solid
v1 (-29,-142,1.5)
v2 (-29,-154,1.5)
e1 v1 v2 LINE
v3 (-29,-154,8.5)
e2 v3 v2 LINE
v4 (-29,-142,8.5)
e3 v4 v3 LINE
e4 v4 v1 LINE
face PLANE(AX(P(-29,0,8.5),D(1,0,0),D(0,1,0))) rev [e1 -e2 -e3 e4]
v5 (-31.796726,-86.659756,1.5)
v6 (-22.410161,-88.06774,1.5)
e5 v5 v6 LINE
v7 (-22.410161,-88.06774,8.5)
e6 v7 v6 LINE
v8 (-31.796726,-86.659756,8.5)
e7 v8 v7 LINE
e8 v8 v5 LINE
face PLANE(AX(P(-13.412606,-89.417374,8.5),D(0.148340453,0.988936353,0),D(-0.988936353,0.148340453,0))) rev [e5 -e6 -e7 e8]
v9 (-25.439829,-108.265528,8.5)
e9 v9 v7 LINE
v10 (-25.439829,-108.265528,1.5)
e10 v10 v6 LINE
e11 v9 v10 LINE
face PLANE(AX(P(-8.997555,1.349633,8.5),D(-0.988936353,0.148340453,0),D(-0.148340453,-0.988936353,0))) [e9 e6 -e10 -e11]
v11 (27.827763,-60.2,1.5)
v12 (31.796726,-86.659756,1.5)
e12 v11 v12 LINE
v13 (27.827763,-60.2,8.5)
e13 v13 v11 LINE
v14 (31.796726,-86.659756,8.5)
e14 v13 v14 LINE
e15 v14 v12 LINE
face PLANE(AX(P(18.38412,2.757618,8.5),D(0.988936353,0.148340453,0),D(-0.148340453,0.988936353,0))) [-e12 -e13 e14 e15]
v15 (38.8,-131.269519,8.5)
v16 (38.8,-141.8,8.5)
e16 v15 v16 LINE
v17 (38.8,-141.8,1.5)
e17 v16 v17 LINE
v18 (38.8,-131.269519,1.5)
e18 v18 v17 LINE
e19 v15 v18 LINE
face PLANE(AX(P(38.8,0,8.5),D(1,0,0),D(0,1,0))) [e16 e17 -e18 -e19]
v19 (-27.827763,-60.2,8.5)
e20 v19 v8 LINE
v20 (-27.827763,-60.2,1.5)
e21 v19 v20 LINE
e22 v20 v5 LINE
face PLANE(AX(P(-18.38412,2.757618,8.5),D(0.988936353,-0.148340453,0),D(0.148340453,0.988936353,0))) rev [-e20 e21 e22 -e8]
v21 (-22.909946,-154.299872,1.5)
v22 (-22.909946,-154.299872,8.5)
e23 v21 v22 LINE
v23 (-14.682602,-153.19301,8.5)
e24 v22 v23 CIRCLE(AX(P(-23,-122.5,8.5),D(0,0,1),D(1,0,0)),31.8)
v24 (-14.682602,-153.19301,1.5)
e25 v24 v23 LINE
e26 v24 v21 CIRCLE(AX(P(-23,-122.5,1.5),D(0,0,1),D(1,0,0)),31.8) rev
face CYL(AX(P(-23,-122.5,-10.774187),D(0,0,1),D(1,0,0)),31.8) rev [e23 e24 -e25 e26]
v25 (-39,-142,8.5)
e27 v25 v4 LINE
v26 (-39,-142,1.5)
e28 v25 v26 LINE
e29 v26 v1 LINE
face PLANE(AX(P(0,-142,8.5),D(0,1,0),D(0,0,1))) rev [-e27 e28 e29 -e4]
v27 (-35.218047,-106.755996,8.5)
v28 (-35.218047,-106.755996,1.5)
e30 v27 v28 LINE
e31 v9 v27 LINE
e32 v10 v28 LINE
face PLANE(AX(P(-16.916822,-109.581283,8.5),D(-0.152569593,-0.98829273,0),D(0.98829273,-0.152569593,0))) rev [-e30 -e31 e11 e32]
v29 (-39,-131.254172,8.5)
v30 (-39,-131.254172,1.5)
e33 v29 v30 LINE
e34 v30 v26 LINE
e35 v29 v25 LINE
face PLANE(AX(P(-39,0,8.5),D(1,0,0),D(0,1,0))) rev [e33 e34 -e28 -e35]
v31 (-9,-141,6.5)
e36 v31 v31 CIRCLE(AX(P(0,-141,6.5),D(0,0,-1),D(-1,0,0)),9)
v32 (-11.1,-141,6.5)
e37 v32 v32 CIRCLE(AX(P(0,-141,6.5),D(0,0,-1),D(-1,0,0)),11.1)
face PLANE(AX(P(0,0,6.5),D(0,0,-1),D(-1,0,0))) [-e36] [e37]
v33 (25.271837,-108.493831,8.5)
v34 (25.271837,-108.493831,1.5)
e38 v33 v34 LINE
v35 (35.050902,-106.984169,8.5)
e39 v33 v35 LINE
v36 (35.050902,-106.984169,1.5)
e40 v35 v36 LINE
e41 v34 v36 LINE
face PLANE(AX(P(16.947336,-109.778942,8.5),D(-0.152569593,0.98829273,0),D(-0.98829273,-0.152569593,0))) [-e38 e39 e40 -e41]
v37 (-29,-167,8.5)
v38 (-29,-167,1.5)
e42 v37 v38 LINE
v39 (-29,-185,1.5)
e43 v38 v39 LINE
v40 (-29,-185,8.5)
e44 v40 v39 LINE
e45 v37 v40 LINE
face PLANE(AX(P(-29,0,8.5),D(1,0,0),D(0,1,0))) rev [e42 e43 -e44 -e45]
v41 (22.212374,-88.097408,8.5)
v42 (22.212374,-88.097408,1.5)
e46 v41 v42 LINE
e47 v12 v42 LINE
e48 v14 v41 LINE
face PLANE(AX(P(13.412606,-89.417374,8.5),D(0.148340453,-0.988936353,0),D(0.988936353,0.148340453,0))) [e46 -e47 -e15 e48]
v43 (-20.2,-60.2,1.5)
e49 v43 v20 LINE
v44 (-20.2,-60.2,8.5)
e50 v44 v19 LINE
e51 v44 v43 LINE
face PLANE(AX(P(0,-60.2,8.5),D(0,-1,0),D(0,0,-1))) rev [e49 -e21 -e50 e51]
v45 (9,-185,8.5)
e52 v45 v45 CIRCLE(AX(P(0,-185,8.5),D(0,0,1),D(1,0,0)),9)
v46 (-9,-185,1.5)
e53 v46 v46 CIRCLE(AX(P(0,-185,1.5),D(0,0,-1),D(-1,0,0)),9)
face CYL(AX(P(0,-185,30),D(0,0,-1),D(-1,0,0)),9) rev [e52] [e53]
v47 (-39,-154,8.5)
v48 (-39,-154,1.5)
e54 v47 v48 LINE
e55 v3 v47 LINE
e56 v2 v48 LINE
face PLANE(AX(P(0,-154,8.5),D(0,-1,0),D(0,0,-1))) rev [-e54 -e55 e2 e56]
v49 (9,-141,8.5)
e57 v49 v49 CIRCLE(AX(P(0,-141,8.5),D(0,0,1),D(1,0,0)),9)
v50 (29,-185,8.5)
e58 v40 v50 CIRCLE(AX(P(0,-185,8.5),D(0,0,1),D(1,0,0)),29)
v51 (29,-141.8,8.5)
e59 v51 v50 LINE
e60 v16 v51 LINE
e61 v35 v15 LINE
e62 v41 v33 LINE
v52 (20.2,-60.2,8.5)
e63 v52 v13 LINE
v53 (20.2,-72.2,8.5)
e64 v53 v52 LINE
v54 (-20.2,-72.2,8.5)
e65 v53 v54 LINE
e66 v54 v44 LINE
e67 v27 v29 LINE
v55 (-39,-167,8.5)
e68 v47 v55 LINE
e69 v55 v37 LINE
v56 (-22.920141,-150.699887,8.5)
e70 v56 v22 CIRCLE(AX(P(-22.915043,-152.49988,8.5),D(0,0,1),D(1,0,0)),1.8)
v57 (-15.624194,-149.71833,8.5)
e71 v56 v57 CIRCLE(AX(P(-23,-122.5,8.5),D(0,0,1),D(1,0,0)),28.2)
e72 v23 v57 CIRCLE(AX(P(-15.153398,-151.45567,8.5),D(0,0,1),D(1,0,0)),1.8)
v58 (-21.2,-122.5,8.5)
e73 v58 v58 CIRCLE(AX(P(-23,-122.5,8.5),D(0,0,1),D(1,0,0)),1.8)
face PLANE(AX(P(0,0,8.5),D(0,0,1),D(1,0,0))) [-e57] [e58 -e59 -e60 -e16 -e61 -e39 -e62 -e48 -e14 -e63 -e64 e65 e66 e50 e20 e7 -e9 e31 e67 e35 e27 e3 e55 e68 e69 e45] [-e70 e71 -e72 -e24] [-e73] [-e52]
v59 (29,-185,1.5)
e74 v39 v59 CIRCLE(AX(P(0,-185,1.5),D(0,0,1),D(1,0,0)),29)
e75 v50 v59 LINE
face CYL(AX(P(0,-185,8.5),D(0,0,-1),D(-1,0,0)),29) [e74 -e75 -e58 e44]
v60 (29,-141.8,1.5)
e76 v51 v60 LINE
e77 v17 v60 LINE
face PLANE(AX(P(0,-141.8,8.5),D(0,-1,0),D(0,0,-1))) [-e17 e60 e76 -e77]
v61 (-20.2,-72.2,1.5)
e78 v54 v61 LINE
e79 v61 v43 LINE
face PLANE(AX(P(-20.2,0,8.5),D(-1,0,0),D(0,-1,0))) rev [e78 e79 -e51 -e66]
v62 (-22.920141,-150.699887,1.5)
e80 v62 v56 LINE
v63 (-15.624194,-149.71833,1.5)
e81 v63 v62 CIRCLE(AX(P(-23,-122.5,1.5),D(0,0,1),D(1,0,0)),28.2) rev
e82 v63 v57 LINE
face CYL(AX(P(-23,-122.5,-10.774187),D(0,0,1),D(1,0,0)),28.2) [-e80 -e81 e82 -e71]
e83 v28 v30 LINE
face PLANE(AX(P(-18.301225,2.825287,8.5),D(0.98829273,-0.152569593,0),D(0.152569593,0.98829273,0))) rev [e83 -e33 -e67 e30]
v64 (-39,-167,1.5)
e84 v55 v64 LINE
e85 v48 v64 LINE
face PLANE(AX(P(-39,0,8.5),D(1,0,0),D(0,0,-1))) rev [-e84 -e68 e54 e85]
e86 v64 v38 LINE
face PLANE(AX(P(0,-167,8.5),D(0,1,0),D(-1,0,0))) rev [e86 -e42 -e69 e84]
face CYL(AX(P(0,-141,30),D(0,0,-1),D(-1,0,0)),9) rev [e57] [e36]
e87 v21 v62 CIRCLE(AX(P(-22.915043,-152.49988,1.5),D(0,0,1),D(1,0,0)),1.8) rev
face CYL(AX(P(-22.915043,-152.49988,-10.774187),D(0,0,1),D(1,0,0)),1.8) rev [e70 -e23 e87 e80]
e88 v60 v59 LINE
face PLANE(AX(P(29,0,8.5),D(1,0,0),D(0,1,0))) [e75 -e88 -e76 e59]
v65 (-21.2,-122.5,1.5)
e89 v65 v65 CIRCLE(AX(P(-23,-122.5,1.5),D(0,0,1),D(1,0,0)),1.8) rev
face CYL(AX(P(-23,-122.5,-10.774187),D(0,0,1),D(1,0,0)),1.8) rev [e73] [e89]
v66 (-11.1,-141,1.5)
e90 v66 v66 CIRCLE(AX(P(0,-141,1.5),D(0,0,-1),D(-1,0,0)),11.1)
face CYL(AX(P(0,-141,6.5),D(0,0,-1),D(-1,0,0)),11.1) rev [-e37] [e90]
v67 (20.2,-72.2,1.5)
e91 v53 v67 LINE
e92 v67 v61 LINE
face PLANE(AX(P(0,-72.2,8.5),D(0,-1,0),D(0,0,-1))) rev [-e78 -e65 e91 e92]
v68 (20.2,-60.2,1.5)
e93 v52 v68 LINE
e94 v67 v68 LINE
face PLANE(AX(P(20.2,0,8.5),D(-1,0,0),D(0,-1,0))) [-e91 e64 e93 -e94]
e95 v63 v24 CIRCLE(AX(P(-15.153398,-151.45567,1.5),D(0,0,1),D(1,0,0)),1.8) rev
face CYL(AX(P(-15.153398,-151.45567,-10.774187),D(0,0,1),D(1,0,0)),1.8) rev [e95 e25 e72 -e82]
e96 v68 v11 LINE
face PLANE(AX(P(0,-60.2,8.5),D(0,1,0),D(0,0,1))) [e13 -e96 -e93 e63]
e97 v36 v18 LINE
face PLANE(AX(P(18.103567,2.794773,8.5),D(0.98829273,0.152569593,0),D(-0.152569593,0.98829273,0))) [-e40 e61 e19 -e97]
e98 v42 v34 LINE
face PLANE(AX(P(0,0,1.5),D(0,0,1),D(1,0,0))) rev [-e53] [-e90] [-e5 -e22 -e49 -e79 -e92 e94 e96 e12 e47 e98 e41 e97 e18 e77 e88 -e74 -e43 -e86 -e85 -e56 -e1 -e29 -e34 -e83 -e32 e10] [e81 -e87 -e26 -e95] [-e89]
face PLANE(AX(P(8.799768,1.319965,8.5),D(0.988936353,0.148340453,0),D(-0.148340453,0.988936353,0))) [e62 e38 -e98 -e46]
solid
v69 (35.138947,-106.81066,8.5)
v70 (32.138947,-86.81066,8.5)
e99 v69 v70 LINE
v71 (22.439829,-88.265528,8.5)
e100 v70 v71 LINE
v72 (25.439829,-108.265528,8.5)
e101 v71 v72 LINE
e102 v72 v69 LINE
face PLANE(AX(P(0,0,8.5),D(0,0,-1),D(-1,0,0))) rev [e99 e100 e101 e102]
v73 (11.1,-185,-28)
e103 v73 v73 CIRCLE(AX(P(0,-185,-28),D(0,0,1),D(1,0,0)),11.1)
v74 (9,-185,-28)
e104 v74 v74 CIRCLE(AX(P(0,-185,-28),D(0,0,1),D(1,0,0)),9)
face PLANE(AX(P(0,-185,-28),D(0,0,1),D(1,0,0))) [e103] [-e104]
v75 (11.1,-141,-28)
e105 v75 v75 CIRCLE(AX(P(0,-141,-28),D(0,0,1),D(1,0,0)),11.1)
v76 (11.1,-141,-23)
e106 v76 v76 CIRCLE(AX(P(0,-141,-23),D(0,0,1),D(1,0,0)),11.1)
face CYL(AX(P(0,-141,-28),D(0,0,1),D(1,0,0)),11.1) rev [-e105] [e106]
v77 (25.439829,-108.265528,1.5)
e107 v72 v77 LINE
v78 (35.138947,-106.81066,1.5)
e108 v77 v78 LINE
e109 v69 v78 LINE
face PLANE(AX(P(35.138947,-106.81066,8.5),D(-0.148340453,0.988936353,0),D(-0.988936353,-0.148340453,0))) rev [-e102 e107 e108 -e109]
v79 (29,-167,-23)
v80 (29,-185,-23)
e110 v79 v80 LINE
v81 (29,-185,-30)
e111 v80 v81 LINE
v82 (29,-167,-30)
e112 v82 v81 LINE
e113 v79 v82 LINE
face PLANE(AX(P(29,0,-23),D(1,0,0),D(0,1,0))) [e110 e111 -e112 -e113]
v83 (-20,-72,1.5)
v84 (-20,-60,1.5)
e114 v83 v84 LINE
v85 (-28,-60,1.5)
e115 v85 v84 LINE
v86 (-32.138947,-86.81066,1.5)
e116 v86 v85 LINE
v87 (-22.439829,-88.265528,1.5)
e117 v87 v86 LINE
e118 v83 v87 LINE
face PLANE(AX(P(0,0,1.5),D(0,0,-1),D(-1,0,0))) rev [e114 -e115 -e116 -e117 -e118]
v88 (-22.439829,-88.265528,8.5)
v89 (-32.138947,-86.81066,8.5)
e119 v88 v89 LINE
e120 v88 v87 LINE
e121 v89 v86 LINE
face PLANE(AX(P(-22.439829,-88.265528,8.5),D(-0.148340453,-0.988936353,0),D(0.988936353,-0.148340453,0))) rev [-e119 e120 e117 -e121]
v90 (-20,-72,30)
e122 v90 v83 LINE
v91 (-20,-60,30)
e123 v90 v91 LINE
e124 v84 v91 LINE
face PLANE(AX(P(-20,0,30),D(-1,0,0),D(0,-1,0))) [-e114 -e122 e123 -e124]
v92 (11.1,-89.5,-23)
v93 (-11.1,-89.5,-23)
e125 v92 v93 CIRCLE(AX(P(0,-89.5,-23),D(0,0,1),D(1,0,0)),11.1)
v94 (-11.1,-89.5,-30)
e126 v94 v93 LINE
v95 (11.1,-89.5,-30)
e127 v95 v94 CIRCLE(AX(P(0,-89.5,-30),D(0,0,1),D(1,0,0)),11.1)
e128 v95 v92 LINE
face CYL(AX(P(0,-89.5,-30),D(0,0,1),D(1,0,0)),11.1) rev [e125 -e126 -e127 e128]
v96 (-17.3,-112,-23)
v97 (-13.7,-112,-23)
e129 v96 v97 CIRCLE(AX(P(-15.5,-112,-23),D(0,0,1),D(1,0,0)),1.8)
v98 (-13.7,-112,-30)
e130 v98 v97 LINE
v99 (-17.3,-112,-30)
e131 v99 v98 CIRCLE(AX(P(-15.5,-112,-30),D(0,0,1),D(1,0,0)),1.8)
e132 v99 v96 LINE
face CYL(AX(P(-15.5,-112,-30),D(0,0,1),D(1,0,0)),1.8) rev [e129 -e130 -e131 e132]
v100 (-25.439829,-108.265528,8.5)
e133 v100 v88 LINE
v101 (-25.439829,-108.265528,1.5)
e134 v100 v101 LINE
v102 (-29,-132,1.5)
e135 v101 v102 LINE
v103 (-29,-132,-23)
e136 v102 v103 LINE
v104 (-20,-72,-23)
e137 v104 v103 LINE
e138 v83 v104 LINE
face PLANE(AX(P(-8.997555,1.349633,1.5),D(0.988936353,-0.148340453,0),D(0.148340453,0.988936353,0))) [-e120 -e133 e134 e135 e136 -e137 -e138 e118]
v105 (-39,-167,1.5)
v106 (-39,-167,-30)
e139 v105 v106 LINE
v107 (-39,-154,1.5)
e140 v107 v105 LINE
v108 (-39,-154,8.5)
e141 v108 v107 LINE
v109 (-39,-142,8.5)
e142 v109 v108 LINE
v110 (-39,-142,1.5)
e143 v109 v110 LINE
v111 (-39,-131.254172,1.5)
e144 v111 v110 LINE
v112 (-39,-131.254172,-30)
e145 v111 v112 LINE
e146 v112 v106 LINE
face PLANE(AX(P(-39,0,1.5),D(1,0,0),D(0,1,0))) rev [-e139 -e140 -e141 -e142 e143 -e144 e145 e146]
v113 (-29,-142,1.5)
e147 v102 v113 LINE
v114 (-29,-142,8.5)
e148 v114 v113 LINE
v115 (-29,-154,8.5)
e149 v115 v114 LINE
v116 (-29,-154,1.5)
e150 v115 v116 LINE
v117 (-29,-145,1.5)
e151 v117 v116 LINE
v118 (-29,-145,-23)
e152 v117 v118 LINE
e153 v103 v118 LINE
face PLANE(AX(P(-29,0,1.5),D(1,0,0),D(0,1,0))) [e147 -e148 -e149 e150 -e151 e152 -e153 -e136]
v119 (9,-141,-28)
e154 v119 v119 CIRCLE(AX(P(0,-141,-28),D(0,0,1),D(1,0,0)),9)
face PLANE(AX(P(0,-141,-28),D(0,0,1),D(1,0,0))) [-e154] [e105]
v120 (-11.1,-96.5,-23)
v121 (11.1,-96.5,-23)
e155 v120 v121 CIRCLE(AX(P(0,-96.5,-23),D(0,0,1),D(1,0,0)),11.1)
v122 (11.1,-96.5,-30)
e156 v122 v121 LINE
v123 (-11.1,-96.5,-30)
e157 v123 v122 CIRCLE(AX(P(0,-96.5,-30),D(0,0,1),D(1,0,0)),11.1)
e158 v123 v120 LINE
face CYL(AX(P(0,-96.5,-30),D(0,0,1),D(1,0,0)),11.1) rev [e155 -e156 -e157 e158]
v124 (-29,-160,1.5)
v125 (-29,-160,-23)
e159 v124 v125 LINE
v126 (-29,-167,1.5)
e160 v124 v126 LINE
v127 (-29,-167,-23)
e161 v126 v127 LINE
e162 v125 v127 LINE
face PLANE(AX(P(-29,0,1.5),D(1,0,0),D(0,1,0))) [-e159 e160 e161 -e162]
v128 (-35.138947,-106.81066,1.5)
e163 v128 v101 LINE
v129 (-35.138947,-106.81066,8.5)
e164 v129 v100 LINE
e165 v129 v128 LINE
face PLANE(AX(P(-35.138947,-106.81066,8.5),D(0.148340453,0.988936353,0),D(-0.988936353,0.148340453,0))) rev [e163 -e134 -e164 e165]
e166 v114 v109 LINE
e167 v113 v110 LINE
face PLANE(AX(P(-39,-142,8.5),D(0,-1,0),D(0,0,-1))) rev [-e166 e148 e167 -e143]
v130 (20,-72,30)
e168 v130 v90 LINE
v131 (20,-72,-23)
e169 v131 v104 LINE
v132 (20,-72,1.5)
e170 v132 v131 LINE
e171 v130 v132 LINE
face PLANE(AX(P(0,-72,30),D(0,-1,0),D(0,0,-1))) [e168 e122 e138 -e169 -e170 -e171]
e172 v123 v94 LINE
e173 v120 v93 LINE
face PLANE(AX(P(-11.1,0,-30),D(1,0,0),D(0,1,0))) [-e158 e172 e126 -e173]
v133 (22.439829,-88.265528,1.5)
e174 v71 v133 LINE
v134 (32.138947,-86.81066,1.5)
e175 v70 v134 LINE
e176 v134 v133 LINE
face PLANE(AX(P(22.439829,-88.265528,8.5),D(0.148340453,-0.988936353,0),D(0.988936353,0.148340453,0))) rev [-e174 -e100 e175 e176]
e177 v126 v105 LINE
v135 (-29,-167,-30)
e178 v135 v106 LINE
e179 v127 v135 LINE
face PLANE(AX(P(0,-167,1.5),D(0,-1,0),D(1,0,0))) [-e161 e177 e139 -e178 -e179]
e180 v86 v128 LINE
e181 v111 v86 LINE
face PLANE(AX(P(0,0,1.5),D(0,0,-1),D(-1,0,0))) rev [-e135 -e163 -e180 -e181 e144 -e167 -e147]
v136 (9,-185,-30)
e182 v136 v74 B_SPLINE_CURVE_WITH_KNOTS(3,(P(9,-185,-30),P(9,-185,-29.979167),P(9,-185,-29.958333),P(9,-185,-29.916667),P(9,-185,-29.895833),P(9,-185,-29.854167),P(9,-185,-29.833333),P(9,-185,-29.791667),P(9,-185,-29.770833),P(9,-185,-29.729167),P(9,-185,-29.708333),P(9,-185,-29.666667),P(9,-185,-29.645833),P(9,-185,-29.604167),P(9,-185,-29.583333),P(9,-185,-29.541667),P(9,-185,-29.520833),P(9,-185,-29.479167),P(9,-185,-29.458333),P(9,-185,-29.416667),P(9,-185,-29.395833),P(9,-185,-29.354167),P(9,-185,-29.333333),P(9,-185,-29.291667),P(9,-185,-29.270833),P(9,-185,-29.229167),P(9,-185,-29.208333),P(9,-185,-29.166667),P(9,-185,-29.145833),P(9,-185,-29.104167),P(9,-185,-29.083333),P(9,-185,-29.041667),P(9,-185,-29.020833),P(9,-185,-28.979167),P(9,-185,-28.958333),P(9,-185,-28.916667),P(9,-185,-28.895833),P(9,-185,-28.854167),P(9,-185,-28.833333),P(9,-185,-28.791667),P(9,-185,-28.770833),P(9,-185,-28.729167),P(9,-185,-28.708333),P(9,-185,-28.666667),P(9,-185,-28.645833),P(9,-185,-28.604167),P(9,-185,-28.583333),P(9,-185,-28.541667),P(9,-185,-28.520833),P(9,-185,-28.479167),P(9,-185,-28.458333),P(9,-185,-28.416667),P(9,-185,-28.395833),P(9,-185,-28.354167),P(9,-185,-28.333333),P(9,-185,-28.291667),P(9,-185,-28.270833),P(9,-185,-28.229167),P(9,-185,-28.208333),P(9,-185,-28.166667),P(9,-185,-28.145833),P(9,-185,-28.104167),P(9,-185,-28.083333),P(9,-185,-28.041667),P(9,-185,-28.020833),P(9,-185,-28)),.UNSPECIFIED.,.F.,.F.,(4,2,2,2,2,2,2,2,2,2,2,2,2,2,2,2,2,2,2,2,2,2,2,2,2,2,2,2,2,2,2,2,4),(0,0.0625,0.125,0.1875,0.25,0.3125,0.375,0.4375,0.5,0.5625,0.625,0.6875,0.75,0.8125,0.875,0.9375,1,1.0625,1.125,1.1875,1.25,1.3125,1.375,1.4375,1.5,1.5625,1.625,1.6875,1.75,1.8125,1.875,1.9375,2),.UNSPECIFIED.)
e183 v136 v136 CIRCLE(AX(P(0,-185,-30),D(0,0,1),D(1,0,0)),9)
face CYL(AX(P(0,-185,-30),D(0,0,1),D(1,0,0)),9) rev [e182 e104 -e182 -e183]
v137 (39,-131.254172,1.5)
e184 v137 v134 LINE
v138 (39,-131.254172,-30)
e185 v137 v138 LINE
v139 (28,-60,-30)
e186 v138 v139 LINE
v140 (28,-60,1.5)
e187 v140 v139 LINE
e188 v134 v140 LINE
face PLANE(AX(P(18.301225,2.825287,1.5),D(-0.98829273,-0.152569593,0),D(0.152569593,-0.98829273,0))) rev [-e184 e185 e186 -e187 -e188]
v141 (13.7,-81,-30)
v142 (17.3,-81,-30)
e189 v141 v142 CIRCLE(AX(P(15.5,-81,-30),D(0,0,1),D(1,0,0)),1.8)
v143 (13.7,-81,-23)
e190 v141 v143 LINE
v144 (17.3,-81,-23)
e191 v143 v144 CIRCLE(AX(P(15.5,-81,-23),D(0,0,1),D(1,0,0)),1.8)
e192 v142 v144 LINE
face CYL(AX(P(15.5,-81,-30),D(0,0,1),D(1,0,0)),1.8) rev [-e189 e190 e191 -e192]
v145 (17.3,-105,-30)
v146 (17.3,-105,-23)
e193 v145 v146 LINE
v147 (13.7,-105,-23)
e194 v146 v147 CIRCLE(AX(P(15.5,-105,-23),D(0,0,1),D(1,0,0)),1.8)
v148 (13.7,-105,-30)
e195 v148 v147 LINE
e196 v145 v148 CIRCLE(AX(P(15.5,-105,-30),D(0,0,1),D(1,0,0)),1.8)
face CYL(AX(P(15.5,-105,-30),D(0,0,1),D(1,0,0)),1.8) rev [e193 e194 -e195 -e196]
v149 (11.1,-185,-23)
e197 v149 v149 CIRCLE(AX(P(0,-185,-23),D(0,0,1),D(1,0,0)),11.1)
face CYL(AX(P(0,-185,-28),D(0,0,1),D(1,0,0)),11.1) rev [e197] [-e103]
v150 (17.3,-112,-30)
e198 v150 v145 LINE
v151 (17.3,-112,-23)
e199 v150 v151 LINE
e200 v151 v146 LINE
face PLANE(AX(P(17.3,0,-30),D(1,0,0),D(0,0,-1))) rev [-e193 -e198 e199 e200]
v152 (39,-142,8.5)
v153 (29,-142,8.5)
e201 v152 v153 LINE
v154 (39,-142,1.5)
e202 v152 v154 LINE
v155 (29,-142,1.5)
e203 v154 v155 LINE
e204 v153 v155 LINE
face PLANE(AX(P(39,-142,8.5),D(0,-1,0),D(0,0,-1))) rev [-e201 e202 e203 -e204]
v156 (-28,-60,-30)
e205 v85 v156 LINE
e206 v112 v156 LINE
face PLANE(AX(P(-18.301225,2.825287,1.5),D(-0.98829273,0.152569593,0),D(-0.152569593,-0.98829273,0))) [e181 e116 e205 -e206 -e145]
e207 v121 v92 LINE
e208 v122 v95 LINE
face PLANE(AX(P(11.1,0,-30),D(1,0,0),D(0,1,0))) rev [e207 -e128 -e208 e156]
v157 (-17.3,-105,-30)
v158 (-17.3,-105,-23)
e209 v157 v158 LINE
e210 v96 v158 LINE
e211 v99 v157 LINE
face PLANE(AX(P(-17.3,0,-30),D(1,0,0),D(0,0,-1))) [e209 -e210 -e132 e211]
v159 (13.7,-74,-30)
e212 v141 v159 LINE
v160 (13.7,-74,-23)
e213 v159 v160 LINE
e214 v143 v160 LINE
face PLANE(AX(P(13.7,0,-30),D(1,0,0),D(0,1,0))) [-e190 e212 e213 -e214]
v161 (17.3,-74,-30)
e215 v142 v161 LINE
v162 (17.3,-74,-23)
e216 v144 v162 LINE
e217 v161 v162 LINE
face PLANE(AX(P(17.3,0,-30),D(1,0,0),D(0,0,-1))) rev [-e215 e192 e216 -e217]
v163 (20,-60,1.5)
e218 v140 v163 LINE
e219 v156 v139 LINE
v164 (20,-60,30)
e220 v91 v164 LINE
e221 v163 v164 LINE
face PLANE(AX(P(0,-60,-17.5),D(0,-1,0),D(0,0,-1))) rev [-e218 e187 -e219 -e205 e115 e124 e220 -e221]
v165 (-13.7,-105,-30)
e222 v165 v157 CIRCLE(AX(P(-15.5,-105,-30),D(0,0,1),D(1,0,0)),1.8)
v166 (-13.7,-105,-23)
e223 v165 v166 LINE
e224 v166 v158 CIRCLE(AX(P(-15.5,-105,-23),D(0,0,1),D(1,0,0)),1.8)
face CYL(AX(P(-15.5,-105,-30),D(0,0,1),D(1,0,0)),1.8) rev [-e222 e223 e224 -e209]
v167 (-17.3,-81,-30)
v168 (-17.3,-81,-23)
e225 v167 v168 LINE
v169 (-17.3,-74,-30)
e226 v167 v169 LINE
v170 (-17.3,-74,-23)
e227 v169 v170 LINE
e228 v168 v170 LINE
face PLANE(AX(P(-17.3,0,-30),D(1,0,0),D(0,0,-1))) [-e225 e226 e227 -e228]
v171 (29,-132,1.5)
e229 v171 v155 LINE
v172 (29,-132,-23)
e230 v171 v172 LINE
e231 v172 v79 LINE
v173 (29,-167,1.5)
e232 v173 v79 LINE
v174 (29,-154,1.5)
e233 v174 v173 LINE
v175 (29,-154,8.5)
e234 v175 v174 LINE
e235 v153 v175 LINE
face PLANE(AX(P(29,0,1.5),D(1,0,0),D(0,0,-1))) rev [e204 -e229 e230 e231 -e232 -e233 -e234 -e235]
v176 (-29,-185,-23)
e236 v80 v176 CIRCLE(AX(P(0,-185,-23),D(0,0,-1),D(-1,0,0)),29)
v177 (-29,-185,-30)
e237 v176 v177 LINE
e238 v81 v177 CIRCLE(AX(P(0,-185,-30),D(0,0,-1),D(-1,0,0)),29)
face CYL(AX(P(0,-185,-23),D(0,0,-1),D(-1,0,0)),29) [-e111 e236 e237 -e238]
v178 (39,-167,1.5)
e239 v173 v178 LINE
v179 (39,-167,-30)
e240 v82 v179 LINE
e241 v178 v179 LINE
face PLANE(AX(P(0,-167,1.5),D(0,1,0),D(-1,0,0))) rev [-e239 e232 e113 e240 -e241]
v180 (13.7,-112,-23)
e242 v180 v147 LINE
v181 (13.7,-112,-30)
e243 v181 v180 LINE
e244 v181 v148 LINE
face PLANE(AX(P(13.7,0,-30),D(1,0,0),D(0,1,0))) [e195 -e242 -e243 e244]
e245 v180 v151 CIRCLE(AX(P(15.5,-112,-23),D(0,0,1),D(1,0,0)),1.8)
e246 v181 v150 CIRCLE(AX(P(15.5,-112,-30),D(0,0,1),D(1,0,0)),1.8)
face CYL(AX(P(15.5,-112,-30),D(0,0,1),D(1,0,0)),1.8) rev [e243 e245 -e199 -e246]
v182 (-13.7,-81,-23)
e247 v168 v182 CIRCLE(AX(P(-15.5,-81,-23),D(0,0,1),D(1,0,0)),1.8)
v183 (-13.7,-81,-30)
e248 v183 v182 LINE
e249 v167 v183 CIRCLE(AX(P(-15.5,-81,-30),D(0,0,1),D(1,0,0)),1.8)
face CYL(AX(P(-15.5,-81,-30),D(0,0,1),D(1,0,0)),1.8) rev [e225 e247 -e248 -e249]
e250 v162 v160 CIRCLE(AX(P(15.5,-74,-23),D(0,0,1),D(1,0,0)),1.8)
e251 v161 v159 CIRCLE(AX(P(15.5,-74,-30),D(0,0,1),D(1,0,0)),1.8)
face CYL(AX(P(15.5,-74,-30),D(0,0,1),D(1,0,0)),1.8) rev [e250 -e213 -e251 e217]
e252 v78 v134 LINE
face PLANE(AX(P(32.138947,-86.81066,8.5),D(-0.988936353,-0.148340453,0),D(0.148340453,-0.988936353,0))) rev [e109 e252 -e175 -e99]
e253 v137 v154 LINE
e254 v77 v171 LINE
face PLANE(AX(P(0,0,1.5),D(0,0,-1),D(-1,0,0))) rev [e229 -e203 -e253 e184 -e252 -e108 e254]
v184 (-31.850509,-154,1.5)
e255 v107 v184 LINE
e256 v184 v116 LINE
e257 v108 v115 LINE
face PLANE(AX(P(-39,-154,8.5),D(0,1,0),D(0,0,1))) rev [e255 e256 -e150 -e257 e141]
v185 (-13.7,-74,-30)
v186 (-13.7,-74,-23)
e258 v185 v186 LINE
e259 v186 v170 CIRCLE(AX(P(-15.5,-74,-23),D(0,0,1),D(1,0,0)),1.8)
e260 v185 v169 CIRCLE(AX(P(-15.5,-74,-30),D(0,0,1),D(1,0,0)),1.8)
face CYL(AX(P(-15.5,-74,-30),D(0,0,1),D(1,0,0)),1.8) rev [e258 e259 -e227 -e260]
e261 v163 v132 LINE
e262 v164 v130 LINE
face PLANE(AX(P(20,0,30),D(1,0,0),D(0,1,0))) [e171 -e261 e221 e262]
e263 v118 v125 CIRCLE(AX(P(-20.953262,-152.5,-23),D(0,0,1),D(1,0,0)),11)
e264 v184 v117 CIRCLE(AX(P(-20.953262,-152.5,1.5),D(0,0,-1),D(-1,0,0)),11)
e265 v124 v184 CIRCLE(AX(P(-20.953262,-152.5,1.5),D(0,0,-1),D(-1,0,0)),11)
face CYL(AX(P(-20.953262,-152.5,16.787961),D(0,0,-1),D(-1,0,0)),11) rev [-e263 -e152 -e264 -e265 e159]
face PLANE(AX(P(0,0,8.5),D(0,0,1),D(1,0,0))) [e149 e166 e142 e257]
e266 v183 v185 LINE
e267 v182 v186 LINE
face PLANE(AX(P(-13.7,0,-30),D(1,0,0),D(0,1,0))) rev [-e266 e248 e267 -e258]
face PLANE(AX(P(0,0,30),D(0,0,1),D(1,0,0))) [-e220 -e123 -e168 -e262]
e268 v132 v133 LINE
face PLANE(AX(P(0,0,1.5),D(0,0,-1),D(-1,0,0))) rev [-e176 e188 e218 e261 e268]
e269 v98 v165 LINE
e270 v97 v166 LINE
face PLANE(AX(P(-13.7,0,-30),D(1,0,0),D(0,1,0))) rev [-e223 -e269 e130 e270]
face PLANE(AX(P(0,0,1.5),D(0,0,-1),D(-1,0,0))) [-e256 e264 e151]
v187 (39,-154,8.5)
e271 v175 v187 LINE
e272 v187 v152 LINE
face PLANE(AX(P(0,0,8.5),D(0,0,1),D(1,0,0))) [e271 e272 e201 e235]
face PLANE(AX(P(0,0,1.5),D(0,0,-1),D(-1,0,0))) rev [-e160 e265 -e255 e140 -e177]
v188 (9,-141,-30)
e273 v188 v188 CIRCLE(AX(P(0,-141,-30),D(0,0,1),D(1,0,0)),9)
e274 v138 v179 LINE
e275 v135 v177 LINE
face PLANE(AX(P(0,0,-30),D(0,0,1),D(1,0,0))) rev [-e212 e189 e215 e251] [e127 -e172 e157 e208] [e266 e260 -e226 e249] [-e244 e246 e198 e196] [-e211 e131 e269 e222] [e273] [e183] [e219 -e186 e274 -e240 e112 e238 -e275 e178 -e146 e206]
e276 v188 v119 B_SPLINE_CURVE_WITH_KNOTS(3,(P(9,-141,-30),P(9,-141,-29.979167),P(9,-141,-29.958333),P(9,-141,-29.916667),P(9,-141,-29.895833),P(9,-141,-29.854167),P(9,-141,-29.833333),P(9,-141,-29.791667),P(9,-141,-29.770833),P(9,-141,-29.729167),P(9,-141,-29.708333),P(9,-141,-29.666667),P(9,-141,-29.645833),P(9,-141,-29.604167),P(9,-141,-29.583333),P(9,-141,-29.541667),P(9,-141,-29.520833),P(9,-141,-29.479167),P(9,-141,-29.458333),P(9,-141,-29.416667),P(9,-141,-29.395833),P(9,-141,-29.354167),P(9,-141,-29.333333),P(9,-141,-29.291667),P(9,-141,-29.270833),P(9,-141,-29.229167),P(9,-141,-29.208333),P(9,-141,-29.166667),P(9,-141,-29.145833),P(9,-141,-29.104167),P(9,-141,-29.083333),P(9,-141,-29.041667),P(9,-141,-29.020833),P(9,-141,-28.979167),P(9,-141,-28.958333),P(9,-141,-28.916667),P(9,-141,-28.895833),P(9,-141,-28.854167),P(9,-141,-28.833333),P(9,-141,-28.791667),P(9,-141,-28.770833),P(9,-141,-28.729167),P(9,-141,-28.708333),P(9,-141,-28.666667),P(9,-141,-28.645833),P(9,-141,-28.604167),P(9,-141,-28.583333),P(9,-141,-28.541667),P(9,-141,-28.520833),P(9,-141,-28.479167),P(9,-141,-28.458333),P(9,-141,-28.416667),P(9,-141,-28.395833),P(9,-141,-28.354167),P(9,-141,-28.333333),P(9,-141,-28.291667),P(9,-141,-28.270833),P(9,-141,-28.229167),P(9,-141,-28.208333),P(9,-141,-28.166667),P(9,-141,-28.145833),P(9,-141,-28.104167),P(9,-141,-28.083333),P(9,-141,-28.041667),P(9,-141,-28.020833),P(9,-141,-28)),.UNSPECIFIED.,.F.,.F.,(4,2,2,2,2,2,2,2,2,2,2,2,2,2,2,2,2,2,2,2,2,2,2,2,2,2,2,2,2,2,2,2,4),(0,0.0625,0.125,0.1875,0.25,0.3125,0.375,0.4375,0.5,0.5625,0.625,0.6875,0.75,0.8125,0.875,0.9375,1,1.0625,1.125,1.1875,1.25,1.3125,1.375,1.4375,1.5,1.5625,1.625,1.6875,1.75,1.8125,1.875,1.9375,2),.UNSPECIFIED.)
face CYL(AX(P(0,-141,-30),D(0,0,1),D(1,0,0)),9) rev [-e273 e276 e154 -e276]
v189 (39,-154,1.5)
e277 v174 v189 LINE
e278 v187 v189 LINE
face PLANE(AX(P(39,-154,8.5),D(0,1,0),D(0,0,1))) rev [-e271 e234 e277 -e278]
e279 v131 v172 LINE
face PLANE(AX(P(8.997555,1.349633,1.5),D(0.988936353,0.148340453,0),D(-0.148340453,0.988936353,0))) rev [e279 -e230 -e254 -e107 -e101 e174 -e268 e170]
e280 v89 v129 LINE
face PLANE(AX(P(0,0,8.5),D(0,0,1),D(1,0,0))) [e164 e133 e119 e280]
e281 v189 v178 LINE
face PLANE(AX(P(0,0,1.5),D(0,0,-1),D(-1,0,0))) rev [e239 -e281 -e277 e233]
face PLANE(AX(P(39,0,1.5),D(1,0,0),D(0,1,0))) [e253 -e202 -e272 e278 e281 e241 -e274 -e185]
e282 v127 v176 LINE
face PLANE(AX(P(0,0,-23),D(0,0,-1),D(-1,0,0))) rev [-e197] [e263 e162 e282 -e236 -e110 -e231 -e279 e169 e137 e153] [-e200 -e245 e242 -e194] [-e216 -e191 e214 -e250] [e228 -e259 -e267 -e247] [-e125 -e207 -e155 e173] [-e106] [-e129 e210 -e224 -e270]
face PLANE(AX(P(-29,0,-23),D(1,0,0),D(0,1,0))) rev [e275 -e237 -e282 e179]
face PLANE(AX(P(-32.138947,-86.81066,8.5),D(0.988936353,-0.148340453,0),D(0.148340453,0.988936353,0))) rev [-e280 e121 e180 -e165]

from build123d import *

# Parameters (mm, degrees)
SKETCH1_R           = 4
BOSS_EXTRUDE1_DEPTH = 30
SKETCH1_3_R         = 4
CUT_EXTRUDE1_DEPTH  = 17.5
BOSS_EXTRUDE2_DEPTH = 7
BOSS_EXTRUDE3_DEPTH = 31.5
CUT_EXTRUDE2_DEPTH  = 224.888365039
SKETCH5_R           = 9
CUT_EXTRUDE3_DEPTH  = 224.888365039
SKETCH5_3_R         = 11.1
SKETCH5_3_R_2       = 9
CUT_EXTRUDE4_DEPTH  = 5
SKETCH8_W           = 10
SKETCH8_H           = 12
BOSS_EXTRUDE4_DEPTH = 7
BOSS_EXTRUDE6_DEPTH = 7
SKETCH12_R          = 9
CUT_EXTRUDE5_DEPTH  = 220.79365323
CUT_EXTRUDE8_START  = -5
SKETCH12_6_R        = 11.1
SKETCH12_6_R_2      = 9
CUT_EXTRUDE8_DEPTH  = 5
SKETCH14_R          = 1.8
CUT_EXTRUDE9_DEPTH  = 7
CUT_EXTRUDE10_DEPTH = 24.5
SKETCH16_W          = 80
SKETCH16_H          = 75
CUT_EXTRUDE11_DEPTH = 162.669415784


# Read off the part's stored shape, not the designer's step: Boss-Extrude6
with BuildPart() as part:
    # Sketch1 → Boss-Extrude1 (new, symmetric)
    with BuildSketch(Plane.XY):
        with BuildLine():
            Line((-20, -72), (20, -72))
            Line((20, -72), (20, 0))
            ThreePointArc((20, 0), (18.973665961, 6.32455532), (16, 12))
            ThreePointArc((16, 12), (0, 16.622844919), (-16, 12))
            ThreePointArc((-16, 12), (-18.973665961, 6.32455532), (-20, 0))
            Line((-20, 0), (-20, -72))
        make_face()
        Circle(SKETCH1_R, mode=Mode.SUBTRACT)
    extrude(amount=BOSS_EXTRUDE1_DEPTH, both=True)

    # Sketch1<3> → Cut-Extrude1 (cut, symmetric)
    with BuildSketch(Plane.XY):
        with BuildLine():
            Line((-20, -60), (20, -60))
            Line((20, -60), (20, 0))
            ThreePointArc((20, 0), (18.973665961, 6.32455532), (16, 12))
            ThreePointArc((16, 12), (0, 16.622844919), (-16, 12))
            ThreePointArc((-16, 12), (-18.973665961, 6.32455532), (-20, 0))
            Line((-20, 0), (-20, -60))
        make_face()
        Circle(SKETCH1_3_R, mode=Mode.SUBTRACT)
    extrude(amount=CUT_EXTRUDE1_DEPTH, both=True, mode=Mode.SUBTRACT)

    # Sketch2 → Boss-Extrude2 (add)
    with BuildSketch(Plane(origin=(0, 0, -30), x_dir=(-1, 0, 0), z_dir=(0, 0, -1))):
        with BuildLine():
            Line((-20, -72), (-29, -132))
            Line((-29, -132), (-29, -167))
            Line((-29, -167), (-29, -185))
            ThreePointArc((-29, -185), (0, -214), (29, -185))
            Line((29, -185), (29, -167))
            Line((29, -167), (29, -132))
            Line((29, -132), (20, -72))
            Line((20, -72), (-20, -72))
        make_face()
    extrude(amount=-BOSS_EXTRUDE2_DEPTH)

    # Sketch2<3> → Boss-Extrude3 (add)
    with BuildSketch(Plane(origin=(0, 0, -30), x_dir=(-1, 0, 0), z_dir=(0, 0, -1))):
        Polygon((-29, -167), (-29, -132), (-20, -72), (-20, -60), (-28, -60), (-39, -131.254171946), (-39, -167), align=None)
        Polygon((20, -60), (20, -72), (29, -132), (29, -167), (39, -167), (39, -131.254171946), (28, -60), align=None)
    extrude(amount=-BOSS_EXTRUDE3_DEPTH)

    # Sketch4 → Cut-Extrude2 (cut, through all)
    with BuildSketch(Plane.XY.offset(-23)):
        with BuildLine():
            Line((-13.7, -112), (-13.7, -105))
            ThreePointArc((-13.7, -105), (-15.5, -103.2), (-17.3, -105))
            Line((-17.3, -105), (-17.3, -112))
            ThreePointArc((-17.3, -112), (-15.5, -113.8), (-13.7, -112))
        make_face()
        with BuildLine():
            Line((17.3, -112), (17.3, -105))
            ThreePointArc((17.3, -105), (15.5, -103.2), (13.7, -105))
            Line((13.7, -105), (13.7, -112))
            ThreePointArc((13.7, -112), (15.5, -113.8), (17.3, -112))
        make_face()
        with BuildLine():
            Line((17.3, -81), (17.3, -74))
            ThreePointArc((17.3, -74), (15.5, -72.2), (13.7, -74))
            Line((13.7, -74), (13.7, -81))
            ThreePointArc((13.7, -81), (15.5, -82.8), (17.3, -81))
        make_face()
        with BuildLine():
            Line((11.1, -96.5), (11.1, -89.5))
            ThreePointArc((11.1, -89.5), (0, -78.4), (-11.1, -89.5))
            Line((-11.1, -89.5), (-11.1, -96.5))
            ThreePointArc((-11.1, -96.5), (0, -107.6), (11.1, -96.5))
        make_face()
        with BuildLine():
            Line((-13.7, -81), (-13.7, -74))
            ThreePointArc((-13.7, -74), (-15.5, -72.2), (-17.3, -74))
            Line((-17.3, -74), (-17.3, -81))
            ThreePointArc((-17.3, -81), (-15.5, -82.8), (-13.7, -81))
        make_face()
    extrude(amount=-CUT_EXTRUDE2_DEPTH, mode=Mode.SUBTRACT)

    # Sketch5 → Cut-Extrude3 (cut, through all)
    with BuildSketch(Plane.XY.offset(-23)):
        with Locations((0, -185)):
            Circle(SKETCH5_R)
        with Locations((0, -141)):
            Circle(SKETCH5_R)
    extrude(amount=-CUT_EXTRUDE3_DEPTH, mode=Mode.SUBTRACT)

    # Sketch5<3> → Cut-Extrude4 (cut)
    # profile 1 of 2: a face of its own
    with BuildSketch(Plane.XY.offset(-23)):
        with Locations((0, -141)):
            Circle(SKETCH5_3_R)
        with Locations((0, -141)):
            Circle(SKETCH5_3_R_2, mode=Mode.SUBTRACT)
    # profile 2 of 2: a face of its own
    with BuildSketch(Plane.XY.offset(-23)):
        with Locations((0, -185)):
            Circle(SKETCH5_3_R)
        with Locations((0, -185)):
            Circle(SKETCH5_3_R_2, mode=Mode.SUBTRACT)
    extrude(amount=-CUT_EXTRUDE4_DEPTH, mode=Mode.SUBTRACT)

    # Sketch8 → Boss-Extrude4 (add)
    with BuildSketch(Plane.XY.offset(1.5)):
        Polygon((-22.43982913, -88.265527531), (-32.138947235, -86.810659815), (-35.138947235, -106.810659815), (-25.43982913, -108.265527531), align=None)
        with Locations((-34, -148)):
            Rectangle(SKETCH8_W, SKETCH8_H)
        with Locations((34, -148)):
            Rectangle(SKETCH8_W, SKETCH8_H)
        Polygon((25.43982913, -108.265527531), (22.43982913, -88.265527531), (32.138947235, -86.810659815), (35.138947235, -106.810659815), align=None)
    extrude(amount=BOSS_EXTRUDE4_DEPTH)

    # Sketch15 → Cut-Extrude10 (cut)
    with BuildSketch(Plane.XY.offset(-23)):
        with BuildLine():
            Line((-29, -145), (-29, -160))
            ThreePointArc((-29, -160), (-31.95326153, -152.5), (-29, -145))
        make_face()
    extrude(amount=CUT_EXTRUDE10_DEPTH, mode=Mode.SUBTRACT)

    # Sketch16 → Cut-Extrude11 (cut, through all)
    with BuildSketch(Plane(origin=(0, -60, 0), x_dir=(1, 0, 0), z_dir=(0, 1, 0))):
        Rectangle(SKETCH16_W, SKETCH16_H)
    extrude(amount=CUT_EXTRUDE11_DEPTH, mode=Mode.SUBTRACT)


with BuildPart() as body_2:
    # Boss-Extrude6 outline → Boss-Extrude6 (new body)
    with BuildSketch(Plane.XY.offset(1.5)):
        with BuildLine():
            ThreePointArc((-29, -185), (0, -214), (29, -185))
            Line((29, -185), (29, -141.8))
            Line((29, -141.8), (38.8, -141.8))
            Line((38.8, -141.8), (38.8, -131.26951874))
            Line((38.8, -131.26951874), (35.050902338, -106.984168789))
            Line((35.050902338, -106.984168789), (25.271837137, -108.493830809))
            Line((25.271837137, -108.493830809), (22.212373769, -88.097408351))
            Line((22.212373769, -88.097408351), (31.796725847, -86.659755539))
            Line((31.796725847, -86.659755539), (27.827762516, -60.2))
            Line((27.827762516, -60.2), (20.2, -60.2))
            Line((20.2, -60.2), (20.2, -72.2))
            Line((20.2, -72.2), (-20.2, -72.2))
            Line((-20.2, -72.2), (-20.2, -60.2))
            Line((-20.2, -60.2), (-27.827762516, -60.2))
            Line((-27.827762516, -60.2), (-31.796725847, -86.659755539))
            Line((-31.796725847, -86.659755539), (-22.410161039, -88.067740261))
            Line((-22.410161039, -88.067740261), (-25.43982913, -108.265527531))
            Line((-25.43982913, -108.265527531), (-35.218046965, -106.755996324))
            Line((-35.218046965, -106.755996324), (-39, -131.254171946))
            Line((-39, -131.254171946), (-39, -142))
            Line((-39, -142), (-29, -142))
            Line((-29, -142), (-29, -154))
            Line((-29, -154), (-39, -154))
            Line((-39, -154), (-39, -167))
            Line((-39, -167), (-29, -167))
            Line((-29, -167), (-29, -185))
        make_face()
    extrude(amount=BOSS_EXTRUDE6_DEPTH)

    # Sketch12 → Cut-Extrude5 (cut, through all)
    with BuildSketch(Plane(origin=(0, 0, 1.5), x_dir=(-1, 0, 0), z_dir=(0, 0, -1))):
        with Locations((0, -185)):
            Circle(SKETCH12_R)
        with Locations((0, -141)):
            Circle(SKETCH12_R)
    extrude(amount=-CUT_EXTRUDE5_DEPTH, mode=Mode.SUBTRACT)

    # Sketch12<6> → Cut-Extrude8 (cut)
    with BuildSketch(Plane(origin=(0, 0, 1.5), x_dir=(-1, 0, 0), z_dir=(0, 0, -1)).offset(CUT_EXTRUDE8_START)):
        with Locations((0, -141)):
            Circle(SKETCH12_6_R)
        with Locations((0, -141)):
            Circle(SKETCH12_6_R_2, mode=Mode.SUBTRACT)
    extrude(amount=CUT_EXTRUDE8_DEPTH, mode=Mode.SUBTRACT)

    # Sketch14 → Cut-Extrude9 (cut)
    with BuildSketch(Plane.XY.offset(8.5)):
        with BuildLine():
            ThreePointArc((-22.909945843, -154.299872488), (-18.76, -154.016065744), (-14.682601732, -153.193010378))
            ThreePointArc((-14.682601732, -153.193010378), (-13.416057651, -150.984874039), (-15.624193989, -149.718329958))
            ThreePointArc((-15.624193989, -149.718329958), (-19.24, -150.448209245), (-22.920140653, -150.699886923))
            ThreePointArc((-22.920140653, -150.699886923), (-24.715036031, -152.504977111), (-22.909945843, -154.299872488))
        make_face()
        with Locations((-23, -122.5)):
            Circle(SKETCH14_R)
    extrude(amount=-CUT_EXTRUDE9_DEPTH, mode=Mode.SUBTRACT)


solid = Compound([part.part, body_2.part])
